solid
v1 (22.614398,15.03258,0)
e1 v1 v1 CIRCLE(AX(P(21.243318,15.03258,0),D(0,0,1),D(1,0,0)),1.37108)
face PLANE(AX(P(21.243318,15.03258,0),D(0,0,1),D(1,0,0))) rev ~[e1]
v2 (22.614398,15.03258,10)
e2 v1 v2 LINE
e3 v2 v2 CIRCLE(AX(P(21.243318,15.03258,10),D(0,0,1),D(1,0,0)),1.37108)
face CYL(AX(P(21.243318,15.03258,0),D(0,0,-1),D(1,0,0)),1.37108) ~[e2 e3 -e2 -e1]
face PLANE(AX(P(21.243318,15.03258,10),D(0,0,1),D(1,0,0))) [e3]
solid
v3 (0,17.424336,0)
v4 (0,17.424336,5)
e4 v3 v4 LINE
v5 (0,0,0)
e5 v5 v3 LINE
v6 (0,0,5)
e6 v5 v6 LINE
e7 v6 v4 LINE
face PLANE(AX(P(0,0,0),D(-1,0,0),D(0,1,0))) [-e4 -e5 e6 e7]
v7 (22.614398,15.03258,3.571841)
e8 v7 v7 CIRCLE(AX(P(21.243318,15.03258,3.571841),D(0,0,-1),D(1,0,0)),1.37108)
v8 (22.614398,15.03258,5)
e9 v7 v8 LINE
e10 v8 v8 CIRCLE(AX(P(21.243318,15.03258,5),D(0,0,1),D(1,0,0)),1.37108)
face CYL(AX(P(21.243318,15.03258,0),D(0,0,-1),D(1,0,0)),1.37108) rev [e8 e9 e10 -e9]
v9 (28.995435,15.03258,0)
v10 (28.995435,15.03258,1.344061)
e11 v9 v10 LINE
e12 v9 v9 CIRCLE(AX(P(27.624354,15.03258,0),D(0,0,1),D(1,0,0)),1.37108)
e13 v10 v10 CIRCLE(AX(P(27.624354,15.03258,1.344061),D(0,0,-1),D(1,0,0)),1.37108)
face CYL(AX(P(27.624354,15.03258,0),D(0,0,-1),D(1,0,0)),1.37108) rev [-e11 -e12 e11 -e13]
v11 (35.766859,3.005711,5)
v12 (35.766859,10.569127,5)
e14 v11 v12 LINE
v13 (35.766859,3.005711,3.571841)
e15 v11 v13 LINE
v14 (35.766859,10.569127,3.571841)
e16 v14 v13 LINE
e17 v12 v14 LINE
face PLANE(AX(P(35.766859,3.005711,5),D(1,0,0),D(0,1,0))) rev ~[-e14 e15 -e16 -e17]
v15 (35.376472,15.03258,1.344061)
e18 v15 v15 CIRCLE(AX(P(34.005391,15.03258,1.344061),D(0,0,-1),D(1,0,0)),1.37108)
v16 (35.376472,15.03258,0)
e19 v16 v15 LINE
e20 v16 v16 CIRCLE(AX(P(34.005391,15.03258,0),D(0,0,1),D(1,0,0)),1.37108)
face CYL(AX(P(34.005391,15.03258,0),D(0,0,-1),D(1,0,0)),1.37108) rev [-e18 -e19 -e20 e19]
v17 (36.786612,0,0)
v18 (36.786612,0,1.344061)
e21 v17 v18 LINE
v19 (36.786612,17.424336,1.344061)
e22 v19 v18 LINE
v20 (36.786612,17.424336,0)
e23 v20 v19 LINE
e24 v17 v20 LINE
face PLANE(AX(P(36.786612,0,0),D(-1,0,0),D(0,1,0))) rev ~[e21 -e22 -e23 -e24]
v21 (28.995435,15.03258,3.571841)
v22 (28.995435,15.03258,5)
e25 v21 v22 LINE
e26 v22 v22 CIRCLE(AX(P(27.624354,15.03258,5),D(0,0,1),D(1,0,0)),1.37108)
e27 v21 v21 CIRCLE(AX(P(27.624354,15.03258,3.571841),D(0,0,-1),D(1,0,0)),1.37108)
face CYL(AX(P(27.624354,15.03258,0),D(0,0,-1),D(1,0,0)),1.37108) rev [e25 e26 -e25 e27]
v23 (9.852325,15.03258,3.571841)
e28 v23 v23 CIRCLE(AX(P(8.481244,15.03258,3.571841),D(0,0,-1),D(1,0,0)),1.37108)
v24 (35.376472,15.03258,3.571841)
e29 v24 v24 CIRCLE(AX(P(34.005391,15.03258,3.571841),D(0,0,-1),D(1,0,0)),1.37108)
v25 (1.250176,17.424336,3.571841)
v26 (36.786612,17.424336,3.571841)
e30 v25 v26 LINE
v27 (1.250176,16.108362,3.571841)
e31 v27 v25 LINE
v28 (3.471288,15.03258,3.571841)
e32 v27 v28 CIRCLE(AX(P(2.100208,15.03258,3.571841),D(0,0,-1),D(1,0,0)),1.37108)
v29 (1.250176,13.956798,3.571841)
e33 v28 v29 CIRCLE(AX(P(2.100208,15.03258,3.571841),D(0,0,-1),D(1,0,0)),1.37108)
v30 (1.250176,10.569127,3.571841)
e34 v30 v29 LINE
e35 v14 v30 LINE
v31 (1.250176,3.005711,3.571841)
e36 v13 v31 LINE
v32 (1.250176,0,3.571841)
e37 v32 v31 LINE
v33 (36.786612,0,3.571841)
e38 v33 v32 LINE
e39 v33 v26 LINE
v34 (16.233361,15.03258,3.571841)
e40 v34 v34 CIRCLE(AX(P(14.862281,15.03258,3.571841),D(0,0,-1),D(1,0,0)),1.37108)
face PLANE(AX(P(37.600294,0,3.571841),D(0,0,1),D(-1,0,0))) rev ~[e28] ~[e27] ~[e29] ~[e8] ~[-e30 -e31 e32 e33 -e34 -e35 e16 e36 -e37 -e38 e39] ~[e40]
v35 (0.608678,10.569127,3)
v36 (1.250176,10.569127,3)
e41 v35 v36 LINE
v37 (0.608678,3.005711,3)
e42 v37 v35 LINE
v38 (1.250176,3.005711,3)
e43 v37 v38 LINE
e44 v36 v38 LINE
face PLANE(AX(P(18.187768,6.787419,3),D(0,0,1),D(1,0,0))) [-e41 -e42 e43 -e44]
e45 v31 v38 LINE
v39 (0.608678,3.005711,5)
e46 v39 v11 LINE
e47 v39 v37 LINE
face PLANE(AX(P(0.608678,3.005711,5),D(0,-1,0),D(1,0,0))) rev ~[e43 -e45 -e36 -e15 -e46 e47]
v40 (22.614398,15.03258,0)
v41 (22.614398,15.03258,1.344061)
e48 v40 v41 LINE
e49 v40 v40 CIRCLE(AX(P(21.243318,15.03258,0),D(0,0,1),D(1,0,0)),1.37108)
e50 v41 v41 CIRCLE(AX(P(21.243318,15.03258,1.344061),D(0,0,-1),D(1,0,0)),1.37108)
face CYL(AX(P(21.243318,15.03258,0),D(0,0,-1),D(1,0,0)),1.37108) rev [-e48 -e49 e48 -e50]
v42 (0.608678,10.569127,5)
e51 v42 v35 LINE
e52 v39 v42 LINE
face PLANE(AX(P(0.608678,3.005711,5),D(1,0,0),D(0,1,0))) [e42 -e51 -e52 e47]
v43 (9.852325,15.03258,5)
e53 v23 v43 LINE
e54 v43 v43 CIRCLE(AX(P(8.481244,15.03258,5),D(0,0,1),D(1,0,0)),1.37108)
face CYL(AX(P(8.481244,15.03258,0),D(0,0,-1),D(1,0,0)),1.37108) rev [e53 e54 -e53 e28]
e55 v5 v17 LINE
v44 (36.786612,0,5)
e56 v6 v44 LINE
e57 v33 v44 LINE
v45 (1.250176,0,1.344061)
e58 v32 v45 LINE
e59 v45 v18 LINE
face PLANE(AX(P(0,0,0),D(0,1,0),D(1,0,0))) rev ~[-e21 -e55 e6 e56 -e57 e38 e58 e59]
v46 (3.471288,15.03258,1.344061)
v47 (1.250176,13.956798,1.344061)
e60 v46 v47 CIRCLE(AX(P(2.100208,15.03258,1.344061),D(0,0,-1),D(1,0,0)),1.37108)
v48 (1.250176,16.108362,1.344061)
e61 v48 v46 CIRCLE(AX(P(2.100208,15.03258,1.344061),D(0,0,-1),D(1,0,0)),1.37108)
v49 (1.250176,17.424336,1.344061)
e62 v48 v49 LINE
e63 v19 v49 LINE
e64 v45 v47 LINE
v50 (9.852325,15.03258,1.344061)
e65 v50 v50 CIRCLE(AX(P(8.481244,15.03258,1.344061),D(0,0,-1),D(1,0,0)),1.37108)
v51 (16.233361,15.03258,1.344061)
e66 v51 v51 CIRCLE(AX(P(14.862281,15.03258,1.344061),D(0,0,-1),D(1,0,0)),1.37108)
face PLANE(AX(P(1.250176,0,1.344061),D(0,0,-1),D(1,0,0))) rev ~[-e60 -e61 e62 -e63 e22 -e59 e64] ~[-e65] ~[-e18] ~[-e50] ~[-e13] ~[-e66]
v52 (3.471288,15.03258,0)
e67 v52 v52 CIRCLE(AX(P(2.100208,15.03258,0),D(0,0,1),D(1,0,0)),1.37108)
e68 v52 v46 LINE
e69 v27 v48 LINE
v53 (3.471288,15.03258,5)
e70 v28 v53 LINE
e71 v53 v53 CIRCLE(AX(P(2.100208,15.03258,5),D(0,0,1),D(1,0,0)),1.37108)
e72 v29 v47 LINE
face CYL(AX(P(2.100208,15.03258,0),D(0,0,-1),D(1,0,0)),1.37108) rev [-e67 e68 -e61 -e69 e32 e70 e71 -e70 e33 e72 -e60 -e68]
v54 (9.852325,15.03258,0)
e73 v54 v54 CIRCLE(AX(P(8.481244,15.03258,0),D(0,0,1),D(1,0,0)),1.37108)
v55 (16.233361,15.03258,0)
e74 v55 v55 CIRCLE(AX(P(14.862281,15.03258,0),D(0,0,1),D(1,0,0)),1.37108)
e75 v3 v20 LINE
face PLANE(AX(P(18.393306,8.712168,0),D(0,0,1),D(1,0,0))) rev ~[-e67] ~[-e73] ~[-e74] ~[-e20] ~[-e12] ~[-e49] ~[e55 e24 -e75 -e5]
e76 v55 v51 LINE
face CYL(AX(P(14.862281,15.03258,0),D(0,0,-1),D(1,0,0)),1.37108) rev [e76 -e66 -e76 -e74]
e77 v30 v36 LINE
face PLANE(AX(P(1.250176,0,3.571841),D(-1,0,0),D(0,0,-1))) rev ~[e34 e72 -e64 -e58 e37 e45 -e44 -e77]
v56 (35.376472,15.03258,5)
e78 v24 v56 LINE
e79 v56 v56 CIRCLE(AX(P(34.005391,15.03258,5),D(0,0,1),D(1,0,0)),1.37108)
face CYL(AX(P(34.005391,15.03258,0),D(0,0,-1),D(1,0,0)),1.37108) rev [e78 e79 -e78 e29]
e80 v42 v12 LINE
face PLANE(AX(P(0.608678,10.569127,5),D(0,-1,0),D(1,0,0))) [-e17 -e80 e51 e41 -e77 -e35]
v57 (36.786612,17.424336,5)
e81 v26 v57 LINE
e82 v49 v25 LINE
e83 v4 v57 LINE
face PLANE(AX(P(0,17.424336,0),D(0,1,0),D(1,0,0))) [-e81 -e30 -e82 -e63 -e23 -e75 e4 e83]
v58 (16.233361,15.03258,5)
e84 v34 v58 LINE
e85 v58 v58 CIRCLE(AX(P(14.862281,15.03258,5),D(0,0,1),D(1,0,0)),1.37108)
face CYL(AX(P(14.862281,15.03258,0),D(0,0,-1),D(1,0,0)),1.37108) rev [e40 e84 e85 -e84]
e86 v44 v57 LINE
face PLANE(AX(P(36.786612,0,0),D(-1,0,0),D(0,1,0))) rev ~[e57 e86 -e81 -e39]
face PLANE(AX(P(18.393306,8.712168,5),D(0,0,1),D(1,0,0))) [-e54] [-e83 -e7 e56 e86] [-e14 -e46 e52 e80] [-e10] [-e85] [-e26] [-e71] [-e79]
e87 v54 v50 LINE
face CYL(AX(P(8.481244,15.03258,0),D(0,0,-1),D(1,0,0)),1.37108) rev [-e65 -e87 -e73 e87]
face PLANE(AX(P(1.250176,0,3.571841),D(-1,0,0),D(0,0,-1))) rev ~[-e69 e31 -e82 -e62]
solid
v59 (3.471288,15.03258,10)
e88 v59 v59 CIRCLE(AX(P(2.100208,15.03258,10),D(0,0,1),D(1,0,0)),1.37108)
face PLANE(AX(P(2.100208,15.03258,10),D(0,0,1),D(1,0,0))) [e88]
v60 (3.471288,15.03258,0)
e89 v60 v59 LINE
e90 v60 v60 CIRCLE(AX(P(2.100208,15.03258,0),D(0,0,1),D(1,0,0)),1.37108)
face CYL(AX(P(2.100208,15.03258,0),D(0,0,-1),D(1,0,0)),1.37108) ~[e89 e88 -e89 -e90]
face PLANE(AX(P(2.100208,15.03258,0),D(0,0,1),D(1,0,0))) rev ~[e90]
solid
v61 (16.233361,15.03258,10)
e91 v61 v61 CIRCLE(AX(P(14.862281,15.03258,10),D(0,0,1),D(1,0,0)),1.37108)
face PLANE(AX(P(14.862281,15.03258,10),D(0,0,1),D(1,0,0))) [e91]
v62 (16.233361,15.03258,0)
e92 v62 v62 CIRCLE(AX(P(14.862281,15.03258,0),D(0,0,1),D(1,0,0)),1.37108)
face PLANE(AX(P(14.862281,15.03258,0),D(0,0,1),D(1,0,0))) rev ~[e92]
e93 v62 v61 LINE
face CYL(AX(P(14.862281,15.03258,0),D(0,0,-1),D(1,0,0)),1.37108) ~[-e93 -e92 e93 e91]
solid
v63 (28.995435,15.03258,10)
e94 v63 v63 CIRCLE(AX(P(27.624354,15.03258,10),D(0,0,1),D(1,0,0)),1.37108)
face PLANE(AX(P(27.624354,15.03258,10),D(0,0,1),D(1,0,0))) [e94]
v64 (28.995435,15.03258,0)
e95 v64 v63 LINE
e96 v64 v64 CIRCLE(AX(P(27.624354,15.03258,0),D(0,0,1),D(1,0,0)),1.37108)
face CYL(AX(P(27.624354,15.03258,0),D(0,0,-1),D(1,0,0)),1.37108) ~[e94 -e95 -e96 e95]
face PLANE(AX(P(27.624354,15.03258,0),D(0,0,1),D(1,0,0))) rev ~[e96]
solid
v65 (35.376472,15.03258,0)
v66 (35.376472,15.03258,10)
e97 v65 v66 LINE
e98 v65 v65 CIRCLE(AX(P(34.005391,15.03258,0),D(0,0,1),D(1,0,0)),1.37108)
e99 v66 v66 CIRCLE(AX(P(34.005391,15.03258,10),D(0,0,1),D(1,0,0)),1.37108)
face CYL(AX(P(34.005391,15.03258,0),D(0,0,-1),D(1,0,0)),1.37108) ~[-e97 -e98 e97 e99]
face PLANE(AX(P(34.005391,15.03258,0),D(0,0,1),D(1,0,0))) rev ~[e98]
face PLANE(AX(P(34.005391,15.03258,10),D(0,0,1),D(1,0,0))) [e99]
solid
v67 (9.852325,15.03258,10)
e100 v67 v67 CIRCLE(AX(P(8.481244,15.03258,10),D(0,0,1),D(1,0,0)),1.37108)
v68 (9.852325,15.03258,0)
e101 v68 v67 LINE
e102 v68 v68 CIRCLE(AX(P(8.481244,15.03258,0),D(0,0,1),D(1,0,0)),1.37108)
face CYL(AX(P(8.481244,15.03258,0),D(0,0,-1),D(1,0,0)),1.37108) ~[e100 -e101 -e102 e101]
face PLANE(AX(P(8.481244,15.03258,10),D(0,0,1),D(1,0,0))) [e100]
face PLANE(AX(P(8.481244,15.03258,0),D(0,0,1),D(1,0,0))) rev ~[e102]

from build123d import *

# Parameters (mm, degrees)
F0_R     = 1.3710803726
F1_DEPTH = 10
F0_W     = 36.7866121233
F0_H     = 17.4243357033
F2_DEPTH = 5
F3_W     = 35.1581810974
F3_H     = 7.5634159148
F4_DEPTH = 2
F6_DEPTH = 25


with BuildPart() as f1:
    # F0 (on Top) → F1 (new body)
    with BuildSketch(Plane.XY):
        with Locations((8.4812443238, 15.0325801224)):
            Circle(F0_R)
    extrude(amount=F1_DEPTH)


with BuildPart() as f1b:
    # F0 (on Top) → F1, piece 2 (new body)
    with BuildSketch(Plane.XY):
        with Locations((14.8622810375, 15.0325801224)):
            Circle(F0_R)
    extrude(amount=F1_DEPTH)


with BuildPart() as f1c:
    # F0 (on Top) → F1, piece 3 (new body)
    with BuildSketch(Plane.XY):
        with Locations((21.2433177512, 15.0325801224)):
            Circle(F0_R)
    extrude(amount=F1_DEPTH)


with BuildPart() as f1d:
    # F0 (on Top) → F1, piece 4 (new body)
    with BuildSketch(Plane.XY):
        with Locations((27.6243544649, 15.0325801224)):
            Circle(F0_R)
    extrude(amount=F1_DEPTH)


with BuildPart() as f1e:
    # F0 (on Top) → F1, piece 5 (new body)
    with BuildSketch(Plane.XY):
        with Locations((34.0053911787, 15.0325801224)):
            Circle(F0_R)
    extrude(amount=F1_DEPTH)


with BuildPart() as f1f:
    # F0 (on Top) → F1, piece 6 (new body)
    with BuildSketch(Plane.XY):
        with Locations((2.1002076101, 15.0325801224)):
            Circle(F0_R)
    extrude(amount=F1_DEPTH)


with BuildPart() as f2:
    # F0 (on Top) → F2 (new body)
    with BuildSketch(Plane.XY):
        with Locations((18.3933060616, 8.7121678516)):
            Rectangle(F0_W, F0_H)
        with Locations((2.1002076101, 15.0325801224)):
            Circle(F0_R, mode=Mode.SUBTRACT)
        with Locations((8.4812443238, 15.0325801224)):
            Circle(F0_R, mode=Mode.SUBTRACT)
        with Locations((14.8622810375, 15.0325801224)):
            Circle(F0_R, mode=Mode.SUBTRACT)
        with Locations((21.2433177512, 15.0325801224)):
            Circle(F0_R, mode=Mode.SUBTRACT)
        with Locations((27.6243544649, 15.0325801224)):
            Circle(F0_R, mode=Mode.SUBTRACT)
        with Locations((34.0053911787, 15.0325801224)):
            Circle(F0_R, mode=Mode.SUBTRACT)
    extrude(amount=F2_DEPTH)

    # F3 (on face) → F4 (cut)
    with BuildSketch(Plane.XY.offset(5)):
        with Locations((18.1877680589, 6.7874193192)):
            Rectangle(F3_W, F3_H)
    extrude(amount=-F4_DEPTH, mode=Mode.SUBTRACT)

    # F5 (on face) → F6 (cut)
    with BuildSketch(Plane.XZ):
        Polygon((1.2501757592, 3.5718409345), (1.2501757592, 1.3440612238), (36.7866121233, 1.3440612238), (37.6002937555, 1.3440612238), (37.6002937555, 3.5718409345), align=None)
    extrude(amount=-F6_DEPTH, mode=Mode.SUBTRACT)


solid = Compound([f1.part, f1b.part, f1c.part, f1d.part, f1e.part, f1f.part, f2.part])
